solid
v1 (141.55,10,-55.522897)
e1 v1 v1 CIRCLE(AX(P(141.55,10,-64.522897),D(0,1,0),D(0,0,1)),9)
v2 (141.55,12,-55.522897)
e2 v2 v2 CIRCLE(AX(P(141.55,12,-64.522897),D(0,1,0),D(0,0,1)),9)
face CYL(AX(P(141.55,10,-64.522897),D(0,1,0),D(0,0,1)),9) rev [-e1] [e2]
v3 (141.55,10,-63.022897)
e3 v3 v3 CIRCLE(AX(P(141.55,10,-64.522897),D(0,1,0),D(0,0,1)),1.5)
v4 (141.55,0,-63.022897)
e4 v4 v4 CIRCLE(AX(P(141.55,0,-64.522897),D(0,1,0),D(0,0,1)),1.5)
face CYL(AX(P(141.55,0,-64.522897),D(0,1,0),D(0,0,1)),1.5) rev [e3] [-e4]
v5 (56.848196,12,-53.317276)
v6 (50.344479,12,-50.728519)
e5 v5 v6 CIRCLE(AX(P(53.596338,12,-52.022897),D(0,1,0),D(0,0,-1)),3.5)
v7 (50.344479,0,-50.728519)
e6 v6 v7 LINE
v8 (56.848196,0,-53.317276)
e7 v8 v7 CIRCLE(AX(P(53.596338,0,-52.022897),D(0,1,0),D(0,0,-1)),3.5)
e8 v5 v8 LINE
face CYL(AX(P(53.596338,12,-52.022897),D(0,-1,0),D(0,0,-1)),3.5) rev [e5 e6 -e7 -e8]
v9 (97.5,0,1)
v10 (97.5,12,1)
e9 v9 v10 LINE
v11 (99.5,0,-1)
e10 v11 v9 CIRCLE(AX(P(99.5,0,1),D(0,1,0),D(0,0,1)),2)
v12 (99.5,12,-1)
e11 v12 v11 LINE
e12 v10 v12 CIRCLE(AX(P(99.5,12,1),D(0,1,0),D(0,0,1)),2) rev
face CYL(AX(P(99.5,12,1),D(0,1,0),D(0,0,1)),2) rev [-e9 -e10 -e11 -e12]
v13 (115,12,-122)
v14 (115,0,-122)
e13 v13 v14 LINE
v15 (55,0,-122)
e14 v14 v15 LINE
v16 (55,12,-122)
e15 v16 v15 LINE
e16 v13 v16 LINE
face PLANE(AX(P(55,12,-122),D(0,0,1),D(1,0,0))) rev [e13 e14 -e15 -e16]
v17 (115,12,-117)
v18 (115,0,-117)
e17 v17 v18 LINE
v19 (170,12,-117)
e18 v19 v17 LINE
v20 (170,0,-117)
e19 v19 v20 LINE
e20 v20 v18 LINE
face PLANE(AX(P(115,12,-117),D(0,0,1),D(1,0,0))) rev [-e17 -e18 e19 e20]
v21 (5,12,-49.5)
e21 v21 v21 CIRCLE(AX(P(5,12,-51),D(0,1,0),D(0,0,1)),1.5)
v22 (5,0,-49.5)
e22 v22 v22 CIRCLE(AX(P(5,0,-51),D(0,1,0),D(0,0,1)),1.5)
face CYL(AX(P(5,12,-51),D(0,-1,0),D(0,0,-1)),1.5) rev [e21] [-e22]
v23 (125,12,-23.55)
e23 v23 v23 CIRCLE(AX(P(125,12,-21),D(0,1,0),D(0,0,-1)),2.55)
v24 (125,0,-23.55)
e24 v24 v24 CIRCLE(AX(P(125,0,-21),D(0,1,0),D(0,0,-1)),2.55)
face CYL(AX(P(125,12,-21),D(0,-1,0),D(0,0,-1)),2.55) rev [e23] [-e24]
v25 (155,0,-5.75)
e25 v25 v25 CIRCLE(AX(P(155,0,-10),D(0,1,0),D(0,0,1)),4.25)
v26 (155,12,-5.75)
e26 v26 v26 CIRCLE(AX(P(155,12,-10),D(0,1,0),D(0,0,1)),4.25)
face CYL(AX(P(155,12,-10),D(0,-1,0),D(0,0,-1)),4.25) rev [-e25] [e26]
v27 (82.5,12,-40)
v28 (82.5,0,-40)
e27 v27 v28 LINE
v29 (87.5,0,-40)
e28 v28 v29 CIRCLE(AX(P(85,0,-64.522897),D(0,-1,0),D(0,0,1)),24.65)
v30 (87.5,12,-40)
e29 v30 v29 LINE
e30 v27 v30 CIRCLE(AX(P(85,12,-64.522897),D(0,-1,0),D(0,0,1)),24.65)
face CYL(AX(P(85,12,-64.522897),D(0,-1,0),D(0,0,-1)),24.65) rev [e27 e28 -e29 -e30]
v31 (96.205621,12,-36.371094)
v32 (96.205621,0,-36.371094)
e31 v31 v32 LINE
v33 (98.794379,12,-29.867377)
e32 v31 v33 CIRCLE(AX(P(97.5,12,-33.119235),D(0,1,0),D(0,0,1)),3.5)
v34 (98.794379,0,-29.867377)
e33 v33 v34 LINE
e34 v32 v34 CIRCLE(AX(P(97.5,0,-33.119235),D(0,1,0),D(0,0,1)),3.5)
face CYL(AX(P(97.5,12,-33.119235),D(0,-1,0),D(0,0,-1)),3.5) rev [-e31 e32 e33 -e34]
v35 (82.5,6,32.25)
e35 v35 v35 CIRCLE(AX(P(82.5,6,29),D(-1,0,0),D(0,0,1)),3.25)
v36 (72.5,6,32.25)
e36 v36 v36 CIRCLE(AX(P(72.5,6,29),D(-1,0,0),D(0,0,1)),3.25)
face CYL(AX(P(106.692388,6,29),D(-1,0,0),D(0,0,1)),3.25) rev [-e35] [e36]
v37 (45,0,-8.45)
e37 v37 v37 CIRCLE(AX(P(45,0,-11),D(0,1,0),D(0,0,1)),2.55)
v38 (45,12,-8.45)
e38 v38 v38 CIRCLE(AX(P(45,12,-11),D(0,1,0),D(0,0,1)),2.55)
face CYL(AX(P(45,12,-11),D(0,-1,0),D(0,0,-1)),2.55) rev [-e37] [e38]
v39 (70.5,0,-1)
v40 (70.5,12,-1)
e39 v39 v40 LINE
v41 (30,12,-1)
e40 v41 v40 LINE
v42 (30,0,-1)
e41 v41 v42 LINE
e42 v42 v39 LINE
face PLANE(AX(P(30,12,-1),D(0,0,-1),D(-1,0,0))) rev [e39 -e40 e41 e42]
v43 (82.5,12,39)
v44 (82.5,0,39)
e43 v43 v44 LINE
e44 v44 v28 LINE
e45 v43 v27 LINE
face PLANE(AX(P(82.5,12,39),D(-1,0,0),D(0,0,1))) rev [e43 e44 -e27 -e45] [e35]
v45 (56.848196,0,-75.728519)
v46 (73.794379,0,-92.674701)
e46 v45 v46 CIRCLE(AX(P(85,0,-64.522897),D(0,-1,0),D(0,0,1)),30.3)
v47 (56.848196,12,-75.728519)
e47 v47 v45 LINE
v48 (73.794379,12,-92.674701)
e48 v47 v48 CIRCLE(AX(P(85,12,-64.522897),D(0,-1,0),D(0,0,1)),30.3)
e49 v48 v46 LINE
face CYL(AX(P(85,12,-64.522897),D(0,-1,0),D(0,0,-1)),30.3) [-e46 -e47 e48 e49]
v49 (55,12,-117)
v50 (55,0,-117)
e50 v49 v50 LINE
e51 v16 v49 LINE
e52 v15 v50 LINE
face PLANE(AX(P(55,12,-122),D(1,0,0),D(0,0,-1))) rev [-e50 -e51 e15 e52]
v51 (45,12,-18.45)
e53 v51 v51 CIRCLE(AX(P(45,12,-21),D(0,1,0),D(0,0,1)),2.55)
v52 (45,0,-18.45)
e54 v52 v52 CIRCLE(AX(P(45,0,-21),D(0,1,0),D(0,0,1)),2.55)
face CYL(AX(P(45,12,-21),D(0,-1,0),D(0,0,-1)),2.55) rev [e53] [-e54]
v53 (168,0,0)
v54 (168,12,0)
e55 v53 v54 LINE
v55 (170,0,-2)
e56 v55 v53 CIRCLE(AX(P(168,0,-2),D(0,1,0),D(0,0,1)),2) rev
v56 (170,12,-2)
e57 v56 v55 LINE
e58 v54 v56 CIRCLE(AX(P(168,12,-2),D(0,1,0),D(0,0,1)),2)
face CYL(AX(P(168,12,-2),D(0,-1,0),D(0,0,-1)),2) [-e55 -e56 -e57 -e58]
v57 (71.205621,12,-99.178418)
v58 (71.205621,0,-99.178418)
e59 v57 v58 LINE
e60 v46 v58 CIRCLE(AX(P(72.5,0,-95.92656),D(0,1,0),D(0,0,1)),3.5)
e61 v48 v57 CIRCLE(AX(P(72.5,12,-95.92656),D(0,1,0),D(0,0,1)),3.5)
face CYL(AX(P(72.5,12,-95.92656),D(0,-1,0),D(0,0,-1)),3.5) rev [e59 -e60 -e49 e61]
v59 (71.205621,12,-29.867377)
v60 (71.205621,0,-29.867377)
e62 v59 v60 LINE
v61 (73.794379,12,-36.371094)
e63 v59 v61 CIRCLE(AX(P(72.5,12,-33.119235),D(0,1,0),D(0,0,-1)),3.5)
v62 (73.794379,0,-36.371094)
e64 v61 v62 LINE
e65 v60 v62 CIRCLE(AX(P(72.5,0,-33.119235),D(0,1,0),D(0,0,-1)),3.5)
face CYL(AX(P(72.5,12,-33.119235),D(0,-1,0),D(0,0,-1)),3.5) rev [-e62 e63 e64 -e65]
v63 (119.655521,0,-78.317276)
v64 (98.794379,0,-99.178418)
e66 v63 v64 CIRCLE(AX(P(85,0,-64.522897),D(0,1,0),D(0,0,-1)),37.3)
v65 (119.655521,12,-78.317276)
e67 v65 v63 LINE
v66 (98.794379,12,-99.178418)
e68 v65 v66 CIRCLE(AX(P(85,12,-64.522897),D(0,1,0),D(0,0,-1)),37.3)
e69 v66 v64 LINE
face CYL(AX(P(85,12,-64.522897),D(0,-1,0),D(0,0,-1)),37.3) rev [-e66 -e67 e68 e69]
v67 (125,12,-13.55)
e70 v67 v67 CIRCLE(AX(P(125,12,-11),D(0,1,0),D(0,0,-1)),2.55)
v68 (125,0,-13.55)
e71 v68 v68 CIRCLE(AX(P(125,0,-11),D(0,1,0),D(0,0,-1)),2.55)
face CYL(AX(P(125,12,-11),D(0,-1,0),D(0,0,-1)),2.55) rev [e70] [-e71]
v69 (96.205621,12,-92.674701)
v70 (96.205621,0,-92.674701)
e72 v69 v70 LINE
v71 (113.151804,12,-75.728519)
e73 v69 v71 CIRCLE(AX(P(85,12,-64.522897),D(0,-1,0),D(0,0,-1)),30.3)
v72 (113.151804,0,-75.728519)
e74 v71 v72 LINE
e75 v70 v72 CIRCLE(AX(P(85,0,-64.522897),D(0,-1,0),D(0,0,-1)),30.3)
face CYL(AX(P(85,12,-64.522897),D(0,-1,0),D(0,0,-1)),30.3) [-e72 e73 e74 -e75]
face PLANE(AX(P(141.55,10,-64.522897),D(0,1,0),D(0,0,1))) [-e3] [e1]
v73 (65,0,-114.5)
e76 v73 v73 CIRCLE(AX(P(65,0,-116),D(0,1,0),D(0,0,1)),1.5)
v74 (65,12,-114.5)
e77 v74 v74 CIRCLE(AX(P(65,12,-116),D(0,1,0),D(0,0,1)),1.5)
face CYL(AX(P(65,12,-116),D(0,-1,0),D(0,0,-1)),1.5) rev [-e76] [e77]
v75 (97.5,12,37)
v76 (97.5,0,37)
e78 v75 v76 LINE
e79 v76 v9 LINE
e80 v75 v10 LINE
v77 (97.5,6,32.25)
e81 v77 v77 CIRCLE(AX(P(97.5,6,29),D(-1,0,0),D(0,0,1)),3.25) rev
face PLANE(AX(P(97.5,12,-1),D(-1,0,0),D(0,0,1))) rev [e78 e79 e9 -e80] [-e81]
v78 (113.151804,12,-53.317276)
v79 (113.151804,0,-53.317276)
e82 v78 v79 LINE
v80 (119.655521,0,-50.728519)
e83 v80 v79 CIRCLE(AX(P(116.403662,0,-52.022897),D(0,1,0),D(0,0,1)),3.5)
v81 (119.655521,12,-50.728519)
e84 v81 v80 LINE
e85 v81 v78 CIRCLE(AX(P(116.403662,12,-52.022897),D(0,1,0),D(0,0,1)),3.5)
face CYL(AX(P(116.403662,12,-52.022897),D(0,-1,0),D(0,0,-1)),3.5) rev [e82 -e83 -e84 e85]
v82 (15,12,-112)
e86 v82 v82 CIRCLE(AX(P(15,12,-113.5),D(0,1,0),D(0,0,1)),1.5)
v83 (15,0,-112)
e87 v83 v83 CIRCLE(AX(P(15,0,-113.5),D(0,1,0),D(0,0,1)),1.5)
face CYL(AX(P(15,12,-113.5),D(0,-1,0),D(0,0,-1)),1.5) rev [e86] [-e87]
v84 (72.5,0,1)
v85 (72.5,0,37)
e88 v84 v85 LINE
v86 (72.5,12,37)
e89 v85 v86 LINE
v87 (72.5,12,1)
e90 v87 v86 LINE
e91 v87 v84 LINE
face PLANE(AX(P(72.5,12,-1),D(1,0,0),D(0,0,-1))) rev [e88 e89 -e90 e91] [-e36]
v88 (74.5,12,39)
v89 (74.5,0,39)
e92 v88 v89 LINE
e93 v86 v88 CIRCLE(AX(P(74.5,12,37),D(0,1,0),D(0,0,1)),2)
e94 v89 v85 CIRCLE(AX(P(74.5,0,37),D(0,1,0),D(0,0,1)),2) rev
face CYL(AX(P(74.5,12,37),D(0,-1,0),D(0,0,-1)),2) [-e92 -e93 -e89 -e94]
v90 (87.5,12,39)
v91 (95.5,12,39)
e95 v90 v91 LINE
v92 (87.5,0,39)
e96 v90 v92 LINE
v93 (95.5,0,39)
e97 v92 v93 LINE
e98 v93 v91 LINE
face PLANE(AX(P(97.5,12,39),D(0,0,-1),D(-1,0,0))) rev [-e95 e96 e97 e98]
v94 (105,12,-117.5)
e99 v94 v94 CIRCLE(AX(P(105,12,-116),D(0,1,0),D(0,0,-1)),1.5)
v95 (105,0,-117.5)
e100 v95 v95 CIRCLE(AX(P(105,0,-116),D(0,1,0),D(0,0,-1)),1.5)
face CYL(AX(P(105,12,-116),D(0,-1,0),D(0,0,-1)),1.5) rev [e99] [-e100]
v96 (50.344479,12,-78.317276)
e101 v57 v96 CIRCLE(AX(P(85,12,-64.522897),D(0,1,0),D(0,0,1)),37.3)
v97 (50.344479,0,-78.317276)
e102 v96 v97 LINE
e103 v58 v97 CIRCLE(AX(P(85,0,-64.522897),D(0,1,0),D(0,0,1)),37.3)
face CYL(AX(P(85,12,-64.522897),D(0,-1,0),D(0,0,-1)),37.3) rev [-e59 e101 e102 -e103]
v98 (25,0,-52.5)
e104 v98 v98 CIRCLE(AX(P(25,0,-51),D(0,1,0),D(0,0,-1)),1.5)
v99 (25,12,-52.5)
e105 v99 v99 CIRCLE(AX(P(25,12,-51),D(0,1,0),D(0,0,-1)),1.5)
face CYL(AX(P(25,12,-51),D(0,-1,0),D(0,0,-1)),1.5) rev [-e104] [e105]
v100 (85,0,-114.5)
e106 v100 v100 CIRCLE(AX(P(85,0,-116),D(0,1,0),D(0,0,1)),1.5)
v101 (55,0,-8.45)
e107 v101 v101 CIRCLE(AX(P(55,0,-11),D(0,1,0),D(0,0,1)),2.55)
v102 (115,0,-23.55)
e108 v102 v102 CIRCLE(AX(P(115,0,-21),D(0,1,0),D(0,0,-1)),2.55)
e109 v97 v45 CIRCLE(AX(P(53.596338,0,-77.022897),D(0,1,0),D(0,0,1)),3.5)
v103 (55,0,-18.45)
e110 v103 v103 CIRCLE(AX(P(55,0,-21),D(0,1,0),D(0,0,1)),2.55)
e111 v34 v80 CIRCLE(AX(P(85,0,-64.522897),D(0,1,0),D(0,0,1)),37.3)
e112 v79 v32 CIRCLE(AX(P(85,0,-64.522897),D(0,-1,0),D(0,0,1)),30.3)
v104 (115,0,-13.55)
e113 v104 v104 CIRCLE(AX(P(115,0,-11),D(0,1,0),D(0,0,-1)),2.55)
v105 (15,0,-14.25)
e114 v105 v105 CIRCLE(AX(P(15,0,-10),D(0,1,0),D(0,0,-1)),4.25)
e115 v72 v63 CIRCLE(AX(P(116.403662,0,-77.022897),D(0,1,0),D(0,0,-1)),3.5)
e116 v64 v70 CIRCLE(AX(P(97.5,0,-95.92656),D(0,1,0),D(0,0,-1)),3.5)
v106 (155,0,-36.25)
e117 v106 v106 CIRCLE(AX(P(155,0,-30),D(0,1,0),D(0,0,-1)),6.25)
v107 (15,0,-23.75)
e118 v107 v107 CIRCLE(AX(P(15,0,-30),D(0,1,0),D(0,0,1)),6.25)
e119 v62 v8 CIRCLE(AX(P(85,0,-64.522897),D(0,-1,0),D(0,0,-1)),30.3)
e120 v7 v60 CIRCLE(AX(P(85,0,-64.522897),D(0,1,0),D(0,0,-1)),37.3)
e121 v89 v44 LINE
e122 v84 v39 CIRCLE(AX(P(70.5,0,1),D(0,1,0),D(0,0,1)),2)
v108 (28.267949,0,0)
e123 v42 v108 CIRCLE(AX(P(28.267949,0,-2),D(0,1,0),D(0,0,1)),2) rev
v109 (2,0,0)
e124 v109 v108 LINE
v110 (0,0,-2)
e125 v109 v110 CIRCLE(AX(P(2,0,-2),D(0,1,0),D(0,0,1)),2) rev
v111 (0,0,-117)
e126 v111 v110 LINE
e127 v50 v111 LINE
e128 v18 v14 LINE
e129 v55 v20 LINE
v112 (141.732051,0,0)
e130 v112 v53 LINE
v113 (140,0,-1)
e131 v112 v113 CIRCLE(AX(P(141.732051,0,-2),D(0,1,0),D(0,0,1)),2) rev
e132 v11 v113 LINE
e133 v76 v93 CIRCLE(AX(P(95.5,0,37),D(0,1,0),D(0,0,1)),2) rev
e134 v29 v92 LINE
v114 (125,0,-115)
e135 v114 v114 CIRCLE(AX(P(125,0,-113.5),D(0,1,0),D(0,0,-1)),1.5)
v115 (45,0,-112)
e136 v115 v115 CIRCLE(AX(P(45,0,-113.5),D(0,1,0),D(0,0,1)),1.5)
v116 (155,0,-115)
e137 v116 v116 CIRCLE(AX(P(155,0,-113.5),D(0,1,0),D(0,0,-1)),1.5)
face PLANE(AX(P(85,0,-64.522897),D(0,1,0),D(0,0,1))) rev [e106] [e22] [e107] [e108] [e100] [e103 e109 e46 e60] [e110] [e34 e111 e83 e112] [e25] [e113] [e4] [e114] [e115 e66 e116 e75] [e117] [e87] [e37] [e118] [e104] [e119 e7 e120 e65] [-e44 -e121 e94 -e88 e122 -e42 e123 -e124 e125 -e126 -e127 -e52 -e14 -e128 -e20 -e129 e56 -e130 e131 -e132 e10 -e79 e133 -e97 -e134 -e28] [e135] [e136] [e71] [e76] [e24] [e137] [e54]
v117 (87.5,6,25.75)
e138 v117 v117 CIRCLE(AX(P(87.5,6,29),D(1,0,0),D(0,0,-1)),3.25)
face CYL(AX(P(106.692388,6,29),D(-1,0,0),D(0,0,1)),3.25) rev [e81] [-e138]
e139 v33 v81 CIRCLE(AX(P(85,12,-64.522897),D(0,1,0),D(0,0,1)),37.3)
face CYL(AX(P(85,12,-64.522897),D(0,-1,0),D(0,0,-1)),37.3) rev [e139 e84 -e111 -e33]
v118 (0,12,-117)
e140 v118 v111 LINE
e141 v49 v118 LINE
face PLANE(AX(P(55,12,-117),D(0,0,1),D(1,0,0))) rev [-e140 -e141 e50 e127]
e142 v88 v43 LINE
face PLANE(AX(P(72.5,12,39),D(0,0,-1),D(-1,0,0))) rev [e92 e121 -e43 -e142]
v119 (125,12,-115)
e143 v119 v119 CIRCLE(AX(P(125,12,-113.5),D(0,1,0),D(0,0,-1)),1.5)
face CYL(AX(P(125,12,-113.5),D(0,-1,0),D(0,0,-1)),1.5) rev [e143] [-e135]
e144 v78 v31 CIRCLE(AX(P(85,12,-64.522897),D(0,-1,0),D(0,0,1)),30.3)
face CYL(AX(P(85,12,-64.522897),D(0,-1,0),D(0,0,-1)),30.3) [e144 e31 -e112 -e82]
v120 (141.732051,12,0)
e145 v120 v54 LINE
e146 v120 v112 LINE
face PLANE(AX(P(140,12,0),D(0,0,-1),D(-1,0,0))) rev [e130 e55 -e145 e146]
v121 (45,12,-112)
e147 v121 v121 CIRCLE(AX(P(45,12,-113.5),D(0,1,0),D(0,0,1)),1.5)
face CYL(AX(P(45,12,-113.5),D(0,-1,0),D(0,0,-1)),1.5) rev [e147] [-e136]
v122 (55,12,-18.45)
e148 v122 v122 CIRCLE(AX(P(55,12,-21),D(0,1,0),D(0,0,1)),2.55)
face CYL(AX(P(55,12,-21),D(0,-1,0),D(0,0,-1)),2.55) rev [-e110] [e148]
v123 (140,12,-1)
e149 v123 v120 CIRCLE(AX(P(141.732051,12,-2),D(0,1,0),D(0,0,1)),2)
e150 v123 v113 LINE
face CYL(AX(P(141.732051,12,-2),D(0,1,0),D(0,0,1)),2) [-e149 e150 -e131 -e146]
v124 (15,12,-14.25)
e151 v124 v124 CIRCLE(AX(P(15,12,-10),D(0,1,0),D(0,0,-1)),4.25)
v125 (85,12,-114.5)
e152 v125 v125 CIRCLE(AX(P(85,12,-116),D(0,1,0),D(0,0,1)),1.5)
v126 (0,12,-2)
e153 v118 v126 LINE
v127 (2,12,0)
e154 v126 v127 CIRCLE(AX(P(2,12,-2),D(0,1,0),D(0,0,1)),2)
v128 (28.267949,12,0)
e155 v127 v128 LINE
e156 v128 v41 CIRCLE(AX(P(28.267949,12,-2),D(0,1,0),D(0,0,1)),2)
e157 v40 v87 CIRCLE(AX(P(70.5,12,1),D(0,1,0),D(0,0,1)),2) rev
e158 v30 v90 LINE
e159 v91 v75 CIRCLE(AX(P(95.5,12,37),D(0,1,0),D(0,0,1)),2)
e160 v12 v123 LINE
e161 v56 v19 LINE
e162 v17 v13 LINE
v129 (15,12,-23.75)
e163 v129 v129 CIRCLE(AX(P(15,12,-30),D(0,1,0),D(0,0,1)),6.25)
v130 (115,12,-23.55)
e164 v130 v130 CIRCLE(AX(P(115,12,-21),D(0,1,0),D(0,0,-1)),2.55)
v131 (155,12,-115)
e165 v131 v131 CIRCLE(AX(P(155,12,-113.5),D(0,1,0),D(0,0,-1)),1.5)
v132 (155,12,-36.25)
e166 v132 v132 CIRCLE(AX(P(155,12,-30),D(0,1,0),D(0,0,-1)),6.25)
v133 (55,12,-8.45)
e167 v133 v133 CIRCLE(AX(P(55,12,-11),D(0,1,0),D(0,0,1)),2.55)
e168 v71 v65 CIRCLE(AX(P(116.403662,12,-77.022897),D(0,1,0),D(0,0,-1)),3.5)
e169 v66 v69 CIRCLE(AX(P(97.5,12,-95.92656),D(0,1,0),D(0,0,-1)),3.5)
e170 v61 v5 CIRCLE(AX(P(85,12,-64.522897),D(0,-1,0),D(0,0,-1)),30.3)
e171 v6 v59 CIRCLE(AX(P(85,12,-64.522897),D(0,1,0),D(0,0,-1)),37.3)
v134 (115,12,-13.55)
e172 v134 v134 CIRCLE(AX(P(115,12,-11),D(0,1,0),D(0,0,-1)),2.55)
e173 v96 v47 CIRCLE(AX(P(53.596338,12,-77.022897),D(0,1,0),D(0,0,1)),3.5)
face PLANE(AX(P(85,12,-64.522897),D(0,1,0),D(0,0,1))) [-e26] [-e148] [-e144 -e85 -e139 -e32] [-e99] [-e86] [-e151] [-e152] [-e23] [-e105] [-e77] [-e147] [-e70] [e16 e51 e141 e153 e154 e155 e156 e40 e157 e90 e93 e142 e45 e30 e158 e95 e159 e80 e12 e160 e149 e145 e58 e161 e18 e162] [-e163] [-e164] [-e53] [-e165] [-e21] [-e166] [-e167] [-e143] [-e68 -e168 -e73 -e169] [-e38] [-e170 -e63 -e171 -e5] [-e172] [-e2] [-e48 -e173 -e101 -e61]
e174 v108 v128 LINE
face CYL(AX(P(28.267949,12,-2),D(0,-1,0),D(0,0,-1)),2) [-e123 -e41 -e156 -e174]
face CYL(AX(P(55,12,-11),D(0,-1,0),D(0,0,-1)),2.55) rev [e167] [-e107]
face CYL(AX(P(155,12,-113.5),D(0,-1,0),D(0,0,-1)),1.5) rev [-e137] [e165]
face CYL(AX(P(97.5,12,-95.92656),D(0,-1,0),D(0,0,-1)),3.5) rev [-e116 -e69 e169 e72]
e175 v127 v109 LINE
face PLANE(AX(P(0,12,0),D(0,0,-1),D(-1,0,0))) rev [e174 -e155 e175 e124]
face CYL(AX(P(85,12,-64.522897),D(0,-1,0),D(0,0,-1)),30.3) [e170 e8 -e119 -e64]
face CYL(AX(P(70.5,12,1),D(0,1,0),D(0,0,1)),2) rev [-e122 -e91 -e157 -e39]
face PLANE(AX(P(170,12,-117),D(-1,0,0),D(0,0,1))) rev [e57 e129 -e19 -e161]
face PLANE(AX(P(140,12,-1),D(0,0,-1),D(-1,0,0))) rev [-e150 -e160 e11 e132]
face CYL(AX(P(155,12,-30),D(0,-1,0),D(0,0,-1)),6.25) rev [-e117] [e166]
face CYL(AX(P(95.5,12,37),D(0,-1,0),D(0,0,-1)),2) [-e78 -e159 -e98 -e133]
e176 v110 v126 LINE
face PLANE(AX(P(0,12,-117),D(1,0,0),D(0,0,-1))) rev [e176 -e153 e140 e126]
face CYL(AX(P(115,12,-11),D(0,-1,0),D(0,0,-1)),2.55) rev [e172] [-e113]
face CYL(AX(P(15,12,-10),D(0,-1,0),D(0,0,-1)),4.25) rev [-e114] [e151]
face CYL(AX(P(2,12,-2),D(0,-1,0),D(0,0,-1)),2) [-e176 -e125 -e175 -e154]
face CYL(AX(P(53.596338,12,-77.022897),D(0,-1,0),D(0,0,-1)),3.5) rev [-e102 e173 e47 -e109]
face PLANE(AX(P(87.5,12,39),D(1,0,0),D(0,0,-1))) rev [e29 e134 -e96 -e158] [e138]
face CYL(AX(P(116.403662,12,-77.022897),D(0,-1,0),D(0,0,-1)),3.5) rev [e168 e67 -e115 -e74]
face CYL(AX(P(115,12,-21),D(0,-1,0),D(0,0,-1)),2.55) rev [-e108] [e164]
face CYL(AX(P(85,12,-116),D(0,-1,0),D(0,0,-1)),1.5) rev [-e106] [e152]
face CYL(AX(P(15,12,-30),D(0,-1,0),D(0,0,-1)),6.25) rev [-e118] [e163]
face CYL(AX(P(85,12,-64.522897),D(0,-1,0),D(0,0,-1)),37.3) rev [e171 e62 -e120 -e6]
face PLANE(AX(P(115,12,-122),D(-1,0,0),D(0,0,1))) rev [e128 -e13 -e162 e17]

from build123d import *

# Parameters (mm, degrees)
SKETCH1_R           = 1.5
SKETCH1_R_2         = 6.25
SKETCH1_R_3         = 2.55
SKETCH1_R_4         = 4.25
BOSS_EXTRUDE1_DEPTH = 12
SKETCH2_R           = 9
CUT_EXTRUDE1_DEPTH  = 2
SKETCH3_R           = 1.5
CUT_EXTRUDE2_DEPTH  = 210.485083001
SKETCH4_R           = 3.25
CUT_EXTRUDE3_DEPTH  = 25
FILLET1_R           = 2


with BuildPart() as part:
    # Sketch1 → Boss-Extrude1 (new body)
    with BuildSketch(Plane(origin=(0, 0, 0), x_dir=(1, 0, 0), z_dir=(0, 1, 0))):
        with BuildLine():
            Line((55, 122), (55, 117))
            Line((55, 117), (0, 117))
            Line((0, 117), (0, 0))
            Line((0, 0), (30, 0))
            Line((30, 0), (30, 1))
            Line((30, 1), (72.5, 1))
            Line((72.5, 1), (72.5, -39))
            Line((72.5, -39), (82.5, -39))
            Line((82.5, -39), (82.5, 40))
            ThreePointArc((82.5, 40), (85, 89.172897463), (87.5, 40))
            Line((87.5, 40), (87.5, -39))
            Line((87.5, -39), (97.5, -39))
            Line((97.5, -39), (97.5, 1))
            Line((97.5, 1), (140, 1))
            Line((140, 1), (140, 0))
            Line((140, 0), (170, 0))
            Line((170, 0), (170, 117))
            Line((170, 117), (115, 117))
            Line((115, 117), (115, 122))
            Line((115, 122), (55, 122))
        make_face()
        with Locations(Location((65, 116, 0), (0, 0, 270))):
            Circle(SKETCH1_R, mode=Mode.SUBTRACT)
        with Locations(Location((105, 116, 0), (0, 0, 90))):
            Circle(SKETCH1_R, mode=Mode.SUBTRACT)
        with Locations(Location((45, 113.5, 0), (0, 0, 270))):
            Circle(SKETCH1_R, mode=Mode.SUBTRACT)
        with Locations(Location((15, 113.5, 0), (0, 0, 270))):
            Circle(SKETCH1_R, mode=Mode.SUBTRACT)
        with Locations(Location((155, 113.5, 0), (0, 0, 90))):
            Circle(SKETCH1_R, mode=Mode.SUBTRACT)
        with Locations(Location((125, 113.5, 0), (0, 0, 90))):
            Circle(SKETCH1_R, mode=Mode.SUBTRACT)
        with Locations(Location((15, 30, 0), (0, 0, 270))):
            Circle(SKETCH1_R_2, mode=Mode.SUBTRACT)
        with Locations(Location((155, 30, 0), (0, 0, 90))):
            Circle(SKETCH1_R_2, mode=Mode.SUBTRACT)
        with Locations(Location((5, 51, 0), (0, 0, 270))):
            Circle(SKETCH1_R, mode=Mode.SUBTRACT)
        with Locations(Location((25, 51, 0), (0, 0, 90))):
            Circle(SKETCH1_R, mode=Mode.SUBTRACT)
        with Locations(Location((45, 11, 0), (0, 0, 270))):
            Circle(SKETCH1_R_3, mode=Mode.SUBTRACT)
        with Locations(Location((55, 11, 0), (0, 0, 270))):
            Circle(SKETCH1_R_3, mode=Mode.SUBTRACT)
        with Locations(Location((45, 21, 0), (0, 0, 270))):
            Circle(SKETCH1_R_3, mode=Mode.SUBTRACT)
        with Locations(Location((55, 21, 0), (0, 0, 270))):
            Circle(SKETCH1_R_3, mode=Mode.SUBTRACT)
        with Locations(Location((125, 11, 0), (0, 0, 90))):
            Circle(SKETCH1_R_3, mode=Mode.SUBTRACT)
        with Locations(Location((125, 21, 0), (0, 0, 90))):
            Circle(SKETCH1_R_3, mode=Mode.SUBTRACT)
        with Locations(Location((115, 21, 0), (0, 0, 90))):
            Circle(SKETCH1_R_3, mode=Mode.SUBTRACT)
        with Locations(Location((115, 11, 0), (0, 0, 90))):
            Circle(SKETCH1_R_3, mode=Mode.SUBTRACT)
        with Locations(Location((155, 10, 0), (0, 0, 270))):
            Circle(SKETCH1_R_4, mode=Mode.SUBTRACT)
        with Locations(Location((15, 10, 0), (0, 0, 90))):
            Circle(SKETCH1_R_4, mode=Mode.SUBTRACT)
        with Locations(Location((85, 116, 0), (0, 0, 270))):
            Circle(SKETCH1_R, mode=Mode.SUBTRACT)
        with BuildLine():
            ThreePointArc((71.205621302, 99.178418183), (58.624917062, 90.897980402), (50.344479281, 78.317276162))
            ThreePointArc((50.344479281, 78.317276162), (52.301959095, 73.771038951), (56.848196306, 75.728518765))
            ThreePointArc((56.848196306, 75.728518765), (63.57466453, 85.948232933), (73.794378698, 92.674701158))
            ThreePointArc((73.794378698, 92.674701158), (75.751858513, 97.220938368), (71.205621302, 99.178418183))
        make_face(mode=Mode.SUBTRACT)
        with BuildLine():
            ThreePointArc((98.794378698, 99.178418183), (111.375082938, 90.897980402), (119.655520719, 78.317276162))
            ThreePointArc((119.655520719, 78.317276162), (117.698040905, 73.771038951), (113.151803694, 75.728518765))
            ThreePointArc((113.151803694, 75.728518765), (106.42533547, 85.948232933), (96.205621302, 92.674701158))
            ThreePointArc((96.205621302, 92.674701158), (94.248141487, 97.220938368), (98.794378698, 99.178418183))
        make_face(mode=Mode.SUBTRACT)
        with BuildLine():
            ThreePointArc((71.205621302, 29.867376744), (58.624917062, 38.147814525), (50.344479281, 50.728518765))
            ThreePointArc((50.344479281, 50.728518765), (52.301959095, 55.274755976), (56.848196306, 53.317276162))
            ThreePointArc((56.848196306, 53.317276162), (63.57466453, 43.097561993), (73.794378698, 36.371093769))
            ThreePointArc((73.794378698, 36.371093769), (75.751858513, 31.824856558), (71.205621302, 29.867376744))
        make_face(mode=Mode.SUBTRACT)
        with BuildLine():
            ThreePointArc((98.794378698, 29.867376744), (111.375082938, 38.147814525), (119.655520719, 50.728518765))
            ThreePointArc((119.655520719, 50.728518765), (117.698040905, 55.274755976), (113.151803694, 53.317276162))
            ThreePointArc((113.151803694, 53.317276162), (106.42533547, 43.097561993), (96.205621302, 36.371093769))
            ThreePointArc((96.205621302, 36.371093769), (94.248141487, 31.824856558), (98.794378698, 29.867376744))
        make_face(mode=Mode.SUBTRACT)
    extrude(amount=BOSS_EXTRUDE1_DEPTH)

    # Sketch2 → Cut-Extrude1 (cut)
    with BuildSketch(Plane(origin=(0, 12, 0), x_dir=(1, 0, 0), z_dir=(0, 1, 0))):
        with Locations(Location((141.55, 64.522897463, 0), (0, 0, 270))):
            Circle(SKETCH2_R)
    extrude(amount=-CUT_EXTRUDE1_DEPTH, mode=Mode.SUBTRACT)

    # Sketch3 → Cut-Extrude2 (cut, through all)
    with BuildSketch(Plane(origin=(0, 10, 0), x_dir=(1, 0, 0), z_dir=(0, 1, 0))):
        with Locations(Location((141.55, 64.522897463, 0), (0, 0, 270))):
            Circle(SKETCH3_R)
    extrude(amount=-CUT_EXTRUDE2_DEPTH, mode=Mode.SUBTRACT)

    # Sketch4 → Cut-Extrude3 (cut)
    with BuildSketch(Plane.ZY.offset(-72.5)):
        with Locations((29, 6)):
            Circle(SKETCH4_R)
    extrude(amount=-CUT_EXTRUDE3_DEPTH, mode=Mode.SUBTRACT)

    # Fillet1
    # the kernel refuses this fillet: 2 mm, written as the material it adds along each edge
    with BuildSketch(Plane(origin=(72.5, 0, -1), x_dir=(-1, 0, 0), z_dir=(0, 1, 0))) as fillet1_piece_1:
        with BuildLine():
            CenterArc((FILLET1_R, FILLET1_R), FILLET1_R, 180, 90)
            Line((0, FILLET1_R), (0, 0))
            Line((0, 0), (FILLET1_R, 0))
        make_face()
    extrude(amount=12)
    with BuildSketch(Plane(origin=(97.5, 0, -1), x_dir=(1, 0, 0), z_dir=(0, 1, 0))) as fillet1_piece_2:
        with BuildLine():
            CenterArc((FILLET1_R, -FILLET1_R), FILLET1_R, 90, 90)
            Line((0, -FILLET1_R), (0, 0))
            Line((0, 0), (FILLET1_R, 0))
        make_face()
    extrude(amount=12)
    # the kernel refuses this fillet: 2 mm, written as the material it takes off along each edge
    with BuildSketch(Plane(origin=(170, -5, 0), x_dir=(0, 0, -1), z_dir=(0, 1, 0)), Plane(origin=(97.5, -5, 39), x_dir=(0, 0, -1), z_dir=(0, 1, 0))) as fillet1_2_piece_1:
        with BuildLine():
            CenterArc((FILLET1_R, FILLET1_R), FILLET1_R, 180, 90)
            Line((0, FILLET1_R), (0, 0))
            Line((0, 0), (FILLET1_R, 0))
        make_face()
    extrude(amount=22, mode=Mode.SUBTRACT)
    with BuildSketch(Plane(origin=(140, -4.330127019, 0), x_dir=(1, 0, 0), z_dir=(0, 1, 0))) as fillet1_2_piece_2:
        with BuildLine():
            CenterArc((1.732050808, 2), FILLET1_R, 210, 60)
            Line((0, 1), (0, 0))
            Line((0, 0), (1.732050808, 0))
        make_face()
    extrude(amount=20.660254038, mode=Mode.SUBTRACT)
    with BuildSketch(Plane(origin=(72.5, -5, 39), x_dir=(0, 0, -1), z_dir=(0, 1, 0)), Plane(origin=(0, -5, 0), x_dir=(0, 0, -1), z_dir=(0, 1, 0))) as fillet1_2_piece_3:
        with BuildLine():
            CenterArc((FILLET1_R, -FILLET1_R), FILLET1_R, 90, 90)
            Line((0, -FILLET1_R), (0, 0))
            Line((0, 0), (FILLET1_R, 0))
        make_face()
    extrude(amount=22, mode=Mode.SUBTRACT)
    with BuildSketch(Plane(origin=(30, -4.330127019, 0), x_dir=(-1, 0, 0), z_dir=(0, 1, 0))) as fillet1_2_piece_4:
        with BuildLine():
            CenterArc((1.732050808, -2), FILLET1_R, 90, 60)
            Line((0, -1), (0, 0))
            Line((0, 0), (1.732050808, 0))
        make_face()
    extrude(amount=20.660254038, mode=Mode.SUBTRACT)


solid = part.part
